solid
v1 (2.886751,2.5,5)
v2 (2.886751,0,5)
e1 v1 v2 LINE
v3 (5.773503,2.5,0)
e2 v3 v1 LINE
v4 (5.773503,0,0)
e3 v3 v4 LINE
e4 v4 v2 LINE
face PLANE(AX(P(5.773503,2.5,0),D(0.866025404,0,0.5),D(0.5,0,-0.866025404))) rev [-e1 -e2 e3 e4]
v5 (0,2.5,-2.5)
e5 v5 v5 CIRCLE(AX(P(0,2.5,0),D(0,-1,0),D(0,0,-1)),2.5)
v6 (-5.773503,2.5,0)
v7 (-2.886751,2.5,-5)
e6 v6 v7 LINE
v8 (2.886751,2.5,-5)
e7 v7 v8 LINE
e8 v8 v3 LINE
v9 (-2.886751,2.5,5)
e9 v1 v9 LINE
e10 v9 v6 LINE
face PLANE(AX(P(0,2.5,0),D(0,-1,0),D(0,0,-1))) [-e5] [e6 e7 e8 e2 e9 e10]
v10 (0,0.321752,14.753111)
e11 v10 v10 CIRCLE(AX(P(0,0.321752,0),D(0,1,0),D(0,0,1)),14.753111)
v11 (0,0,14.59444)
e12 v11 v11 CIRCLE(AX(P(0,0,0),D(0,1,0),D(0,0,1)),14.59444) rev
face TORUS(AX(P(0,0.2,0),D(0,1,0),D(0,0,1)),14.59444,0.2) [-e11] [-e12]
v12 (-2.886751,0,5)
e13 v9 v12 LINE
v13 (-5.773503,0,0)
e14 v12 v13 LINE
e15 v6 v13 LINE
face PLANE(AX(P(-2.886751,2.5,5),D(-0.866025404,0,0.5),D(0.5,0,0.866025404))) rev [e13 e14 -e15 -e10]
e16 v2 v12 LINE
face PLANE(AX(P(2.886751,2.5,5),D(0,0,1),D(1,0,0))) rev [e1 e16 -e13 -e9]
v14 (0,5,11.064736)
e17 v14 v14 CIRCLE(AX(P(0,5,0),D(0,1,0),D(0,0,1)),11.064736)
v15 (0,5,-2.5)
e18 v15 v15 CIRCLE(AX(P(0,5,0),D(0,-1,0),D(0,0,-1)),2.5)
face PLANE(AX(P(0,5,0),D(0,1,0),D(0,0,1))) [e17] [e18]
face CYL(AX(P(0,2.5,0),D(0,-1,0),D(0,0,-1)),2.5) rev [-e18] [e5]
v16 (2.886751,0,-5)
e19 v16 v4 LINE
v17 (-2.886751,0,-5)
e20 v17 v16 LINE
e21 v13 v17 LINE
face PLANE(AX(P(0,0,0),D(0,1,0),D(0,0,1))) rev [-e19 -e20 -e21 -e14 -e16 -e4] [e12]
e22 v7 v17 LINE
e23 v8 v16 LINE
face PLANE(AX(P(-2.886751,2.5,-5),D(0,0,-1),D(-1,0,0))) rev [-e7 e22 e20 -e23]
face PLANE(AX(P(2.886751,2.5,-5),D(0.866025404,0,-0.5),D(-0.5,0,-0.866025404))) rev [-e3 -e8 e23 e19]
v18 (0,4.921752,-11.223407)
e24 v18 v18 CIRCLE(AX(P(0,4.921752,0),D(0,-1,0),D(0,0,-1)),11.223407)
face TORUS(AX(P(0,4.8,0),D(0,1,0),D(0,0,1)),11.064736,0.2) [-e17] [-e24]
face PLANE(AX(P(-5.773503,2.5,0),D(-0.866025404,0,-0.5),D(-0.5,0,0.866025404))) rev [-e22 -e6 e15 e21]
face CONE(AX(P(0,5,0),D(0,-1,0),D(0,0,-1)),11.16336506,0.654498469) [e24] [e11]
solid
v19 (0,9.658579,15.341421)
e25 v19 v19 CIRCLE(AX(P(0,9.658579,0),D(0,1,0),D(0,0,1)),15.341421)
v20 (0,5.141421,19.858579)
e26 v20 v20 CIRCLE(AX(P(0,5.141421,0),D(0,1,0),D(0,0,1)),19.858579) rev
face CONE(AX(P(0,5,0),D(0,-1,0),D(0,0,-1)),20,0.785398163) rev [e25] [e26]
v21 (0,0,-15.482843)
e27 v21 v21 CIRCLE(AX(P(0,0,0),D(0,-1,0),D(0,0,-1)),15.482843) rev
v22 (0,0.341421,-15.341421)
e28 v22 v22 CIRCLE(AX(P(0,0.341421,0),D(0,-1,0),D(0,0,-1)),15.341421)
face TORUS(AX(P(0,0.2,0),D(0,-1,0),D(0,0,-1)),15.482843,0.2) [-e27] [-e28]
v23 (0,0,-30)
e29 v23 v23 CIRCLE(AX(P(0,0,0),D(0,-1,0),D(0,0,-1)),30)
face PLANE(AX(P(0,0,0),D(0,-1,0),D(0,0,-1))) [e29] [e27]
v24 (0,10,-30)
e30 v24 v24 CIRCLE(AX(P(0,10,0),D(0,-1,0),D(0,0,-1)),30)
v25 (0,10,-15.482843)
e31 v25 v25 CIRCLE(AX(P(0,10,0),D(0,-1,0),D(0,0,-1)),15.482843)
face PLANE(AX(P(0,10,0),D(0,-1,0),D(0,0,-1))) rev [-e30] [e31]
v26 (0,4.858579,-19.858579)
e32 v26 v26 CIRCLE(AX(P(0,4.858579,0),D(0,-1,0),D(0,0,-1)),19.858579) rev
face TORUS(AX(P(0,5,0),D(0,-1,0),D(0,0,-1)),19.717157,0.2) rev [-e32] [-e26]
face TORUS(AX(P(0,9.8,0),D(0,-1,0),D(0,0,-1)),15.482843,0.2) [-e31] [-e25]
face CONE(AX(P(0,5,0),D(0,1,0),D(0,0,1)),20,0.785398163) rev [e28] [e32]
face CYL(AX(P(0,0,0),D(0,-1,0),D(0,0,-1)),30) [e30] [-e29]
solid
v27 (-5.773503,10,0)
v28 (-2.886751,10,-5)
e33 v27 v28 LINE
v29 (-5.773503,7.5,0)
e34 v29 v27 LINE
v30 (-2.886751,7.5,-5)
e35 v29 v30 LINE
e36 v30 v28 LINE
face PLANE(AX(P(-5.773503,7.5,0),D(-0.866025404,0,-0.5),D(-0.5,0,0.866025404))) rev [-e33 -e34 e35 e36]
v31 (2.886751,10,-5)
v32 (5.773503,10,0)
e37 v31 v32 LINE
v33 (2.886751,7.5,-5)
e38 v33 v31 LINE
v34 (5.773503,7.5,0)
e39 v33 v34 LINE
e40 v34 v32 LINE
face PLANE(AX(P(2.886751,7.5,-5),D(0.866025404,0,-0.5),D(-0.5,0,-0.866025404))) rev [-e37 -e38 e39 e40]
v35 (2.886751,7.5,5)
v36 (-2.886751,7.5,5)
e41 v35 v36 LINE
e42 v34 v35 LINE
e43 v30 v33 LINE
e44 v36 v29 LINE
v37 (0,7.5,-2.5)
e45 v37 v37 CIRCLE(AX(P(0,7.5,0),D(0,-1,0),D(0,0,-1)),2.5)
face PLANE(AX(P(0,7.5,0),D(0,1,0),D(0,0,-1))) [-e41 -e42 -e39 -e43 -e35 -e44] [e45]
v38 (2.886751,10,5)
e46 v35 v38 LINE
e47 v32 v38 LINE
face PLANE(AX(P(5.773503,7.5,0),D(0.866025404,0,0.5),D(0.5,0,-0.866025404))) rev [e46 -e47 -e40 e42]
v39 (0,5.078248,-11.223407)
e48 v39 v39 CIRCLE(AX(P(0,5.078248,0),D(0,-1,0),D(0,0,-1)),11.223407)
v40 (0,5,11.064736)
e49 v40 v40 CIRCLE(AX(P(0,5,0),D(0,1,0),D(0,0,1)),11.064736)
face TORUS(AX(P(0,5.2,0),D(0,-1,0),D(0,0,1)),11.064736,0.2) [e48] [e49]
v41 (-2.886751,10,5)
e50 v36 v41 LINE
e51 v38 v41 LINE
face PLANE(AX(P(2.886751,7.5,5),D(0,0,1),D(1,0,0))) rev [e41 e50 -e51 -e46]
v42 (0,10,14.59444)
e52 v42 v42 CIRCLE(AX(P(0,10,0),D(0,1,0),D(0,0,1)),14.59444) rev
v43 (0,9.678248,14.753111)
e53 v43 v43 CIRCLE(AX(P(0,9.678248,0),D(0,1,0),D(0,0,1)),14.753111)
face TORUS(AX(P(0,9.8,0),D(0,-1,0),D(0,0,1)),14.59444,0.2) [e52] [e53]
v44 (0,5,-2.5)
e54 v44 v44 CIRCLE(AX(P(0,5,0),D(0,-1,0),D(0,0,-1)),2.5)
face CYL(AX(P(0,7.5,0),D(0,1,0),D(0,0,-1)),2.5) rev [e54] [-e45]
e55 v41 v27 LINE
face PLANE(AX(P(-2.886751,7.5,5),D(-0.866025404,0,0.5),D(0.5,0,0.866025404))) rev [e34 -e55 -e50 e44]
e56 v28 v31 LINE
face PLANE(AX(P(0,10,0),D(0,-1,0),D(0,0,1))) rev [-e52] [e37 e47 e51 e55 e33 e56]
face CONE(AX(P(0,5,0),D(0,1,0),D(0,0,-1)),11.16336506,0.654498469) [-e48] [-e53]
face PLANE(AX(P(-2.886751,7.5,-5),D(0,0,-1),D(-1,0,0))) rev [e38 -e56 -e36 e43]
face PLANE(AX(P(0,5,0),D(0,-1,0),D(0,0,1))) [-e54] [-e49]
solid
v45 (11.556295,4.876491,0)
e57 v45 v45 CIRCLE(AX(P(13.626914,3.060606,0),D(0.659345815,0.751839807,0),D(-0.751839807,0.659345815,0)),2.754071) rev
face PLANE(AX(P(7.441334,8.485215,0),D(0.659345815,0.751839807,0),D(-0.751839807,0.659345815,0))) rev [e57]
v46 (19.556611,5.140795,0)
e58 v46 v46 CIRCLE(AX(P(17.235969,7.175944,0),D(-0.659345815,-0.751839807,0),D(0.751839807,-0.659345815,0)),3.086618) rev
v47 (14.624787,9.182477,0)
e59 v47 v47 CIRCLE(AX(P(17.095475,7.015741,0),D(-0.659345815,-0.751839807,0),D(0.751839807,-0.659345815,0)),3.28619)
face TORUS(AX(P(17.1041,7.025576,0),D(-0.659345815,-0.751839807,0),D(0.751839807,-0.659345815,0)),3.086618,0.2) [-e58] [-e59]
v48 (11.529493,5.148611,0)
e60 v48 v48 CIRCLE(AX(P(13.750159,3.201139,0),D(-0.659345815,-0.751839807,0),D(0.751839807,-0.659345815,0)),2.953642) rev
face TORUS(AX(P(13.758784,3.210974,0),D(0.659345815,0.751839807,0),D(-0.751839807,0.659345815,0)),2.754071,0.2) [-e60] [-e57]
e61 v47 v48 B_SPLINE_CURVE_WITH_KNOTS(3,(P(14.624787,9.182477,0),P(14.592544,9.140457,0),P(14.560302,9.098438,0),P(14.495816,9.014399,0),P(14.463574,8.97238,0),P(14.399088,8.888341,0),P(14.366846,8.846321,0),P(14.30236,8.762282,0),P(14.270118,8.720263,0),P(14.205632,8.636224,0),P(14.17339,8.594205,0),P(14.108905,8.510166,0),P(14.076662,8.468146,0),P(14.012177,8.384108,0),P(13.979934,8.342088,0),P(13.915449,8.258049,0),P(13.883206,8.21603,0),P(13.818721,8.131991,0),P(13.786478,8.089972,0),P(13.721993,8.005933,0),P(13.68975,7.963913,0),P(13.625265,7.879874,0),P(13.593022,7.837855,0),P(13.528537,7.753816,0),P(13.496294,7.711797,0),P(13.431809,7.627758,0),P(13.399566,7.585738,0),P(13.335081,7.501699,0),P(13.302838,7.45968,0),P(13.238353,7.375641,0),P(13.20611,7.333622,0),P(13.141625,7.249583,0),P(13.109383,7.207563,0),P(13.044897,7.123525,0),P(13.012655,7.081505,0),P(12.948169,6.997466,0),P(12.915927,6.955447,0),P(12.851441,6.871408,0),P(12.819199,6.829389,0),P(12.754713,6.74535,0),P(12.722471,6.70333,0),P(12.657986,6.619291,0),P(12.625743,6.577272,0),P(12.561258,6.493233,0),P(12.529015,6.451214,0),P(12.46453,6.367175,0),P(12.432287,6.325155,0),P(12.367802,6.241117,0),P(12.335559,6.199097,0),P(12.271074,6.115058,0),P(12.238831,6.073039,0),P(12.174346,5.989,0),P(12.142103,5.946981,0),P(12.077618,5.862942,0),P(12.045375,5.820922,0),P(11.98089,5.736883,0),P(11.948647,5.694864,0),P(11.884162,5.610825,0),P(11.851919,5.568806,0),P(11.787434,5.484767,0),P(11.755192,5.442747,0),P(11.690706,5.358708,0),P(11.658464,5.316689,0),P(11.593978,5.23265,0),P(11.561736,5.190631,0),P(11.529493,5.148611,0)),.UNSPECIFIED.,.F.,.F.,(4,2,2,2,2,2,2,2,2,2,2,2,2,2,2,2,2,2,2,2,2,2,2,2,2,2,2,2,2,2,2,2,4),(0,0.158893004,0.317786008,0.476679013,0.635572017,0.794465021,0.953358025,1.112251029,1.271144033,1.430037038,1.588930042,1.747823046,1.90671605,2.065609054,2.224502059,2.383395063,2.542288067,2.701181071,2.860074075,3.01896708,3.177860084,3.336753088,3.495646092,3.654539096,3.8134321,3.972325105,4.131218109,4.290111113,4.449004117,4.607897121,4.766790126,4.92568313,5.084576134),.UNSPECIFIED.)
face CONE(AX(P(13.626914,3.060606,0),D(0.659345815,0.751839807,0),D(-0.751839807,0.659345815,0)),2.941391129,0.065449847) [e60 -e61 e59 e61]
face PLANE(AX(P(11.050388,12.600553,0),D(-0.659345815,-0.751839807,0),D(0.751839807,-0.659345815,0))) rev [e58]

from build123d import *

# Parameters (mm, degrees)
FILLET1_R                = 0.2
CUTEXTRUDE1_DEPTH        = 2.5
F_5_0_5_DIAMETER_HOLE1_D = 5
FILLET2_R                = 0.2
FILLET3_R                = 0.2


# Read off the part's stored shape, not the designer's step: Body2, Body3
with BuildPart() as part:
    # profile → Body1 (revolve)
    with BuildSketch(Plane.XY, mode=Mode.PRIVATE) as body1_sk:
        Polygon((0, 0), (15, 0), (11.16336506, 5), (0, 5), align=None)
    revolve(body1_sk.sketch.rotate(Axis((0, 0, 0), (0, 1, 0)), 90), axis=Axis((0, 0, 0), (0, 1, 0)))

    # Fillet1
    fillet1_edges = [part.edges().sort_by_distance(p)[0] for p in [
        (0, 0, 15),
        (0, 5, 11.16336506),
    ]]
    fillet(fillet1_edges, radius=FILLET1_R)

    # Sketch6 → CutExtrude1 (cut)
    with BuildSketch(Plane(origin=(0, 0, 0), x_dir=(-1, 0, 0), z_dir=(0, -1, 0))):
        Polygon((5.773502692, 0), (2.886751346, 5), (-2.886751346, 5), (-5.773502692, 0), (-2.886751346, -5), (2.886751346, -5), align=None)
    extrude(amount=-CUTEXTRUDE1_DEPTH, mode=Mode.SUBTRACT)

    # Ø5.0 (5) Diameter Hole1 (through all)
    with Locations(Plane(origin=(0, 2.5, 0), x_dir=(-1, 0, 0), z_dir=(0, -1, 0))):
        with Locations((0, 0)):
            Hole(F_5_0_5_DIAMETER_HOLE1_D / 2)


with BuildPart() as body_2:
    # Mirror1: mirrored copy
    add(part.part.mirror(Plane.ZX.offset(5)))


with BuildPart() as body_3:
    # Body2 outline → Body2 (revolve)
    with BuildSketch(Plane.XY):
        Polygon((30, 10), (15, 10), (20, 5), (15, 0), (30, 0), align=None)
    revolve(axis=Axis((0, 0, 0), (0, 1, 0)))

    # Fillet2
    fillet2_edges = [body_3.edges().sort_by_distance(p)[0] for p in [
        (-15, 10, 0),
        (-15, 0, 0),
        (-20, 5, 0),
    ]]
    fillet(fillet2_edges, radius=FILLET2_R)


with BuildPart() as body_4:
    # Body3 outline → Body3 (revolve)
    with BuildSketch(Plane(origin=(6.185580792, -5.424608764, 0), x_dir=(0.7518398074789754, -0.6593458151000714, 0), z_dir=(0, 0, 1))):
        Polygon((0, 16.759624181), (0, 11.285934514), (2.941391129, 11.285934514), (3.300155705, 16.759624181), align=None)
    revolve(axis=Axis((6.185580792, -5.424608764, 0), (0.6593458151000715, 0.7518398074789756, 0)))

    # Fillet3
    fillet3_edges = [body_4.edges().sort_by_distance(p)[0] for p in [
        (11.415459543, 5, 0),
        (14.754780428, 9.351887707, 0),
    ]]
    fillet(fillet3_edges, radius=FILLET3_R)


solid = Compound([part.part, body_2.part, body_3.part, body_4.part])
